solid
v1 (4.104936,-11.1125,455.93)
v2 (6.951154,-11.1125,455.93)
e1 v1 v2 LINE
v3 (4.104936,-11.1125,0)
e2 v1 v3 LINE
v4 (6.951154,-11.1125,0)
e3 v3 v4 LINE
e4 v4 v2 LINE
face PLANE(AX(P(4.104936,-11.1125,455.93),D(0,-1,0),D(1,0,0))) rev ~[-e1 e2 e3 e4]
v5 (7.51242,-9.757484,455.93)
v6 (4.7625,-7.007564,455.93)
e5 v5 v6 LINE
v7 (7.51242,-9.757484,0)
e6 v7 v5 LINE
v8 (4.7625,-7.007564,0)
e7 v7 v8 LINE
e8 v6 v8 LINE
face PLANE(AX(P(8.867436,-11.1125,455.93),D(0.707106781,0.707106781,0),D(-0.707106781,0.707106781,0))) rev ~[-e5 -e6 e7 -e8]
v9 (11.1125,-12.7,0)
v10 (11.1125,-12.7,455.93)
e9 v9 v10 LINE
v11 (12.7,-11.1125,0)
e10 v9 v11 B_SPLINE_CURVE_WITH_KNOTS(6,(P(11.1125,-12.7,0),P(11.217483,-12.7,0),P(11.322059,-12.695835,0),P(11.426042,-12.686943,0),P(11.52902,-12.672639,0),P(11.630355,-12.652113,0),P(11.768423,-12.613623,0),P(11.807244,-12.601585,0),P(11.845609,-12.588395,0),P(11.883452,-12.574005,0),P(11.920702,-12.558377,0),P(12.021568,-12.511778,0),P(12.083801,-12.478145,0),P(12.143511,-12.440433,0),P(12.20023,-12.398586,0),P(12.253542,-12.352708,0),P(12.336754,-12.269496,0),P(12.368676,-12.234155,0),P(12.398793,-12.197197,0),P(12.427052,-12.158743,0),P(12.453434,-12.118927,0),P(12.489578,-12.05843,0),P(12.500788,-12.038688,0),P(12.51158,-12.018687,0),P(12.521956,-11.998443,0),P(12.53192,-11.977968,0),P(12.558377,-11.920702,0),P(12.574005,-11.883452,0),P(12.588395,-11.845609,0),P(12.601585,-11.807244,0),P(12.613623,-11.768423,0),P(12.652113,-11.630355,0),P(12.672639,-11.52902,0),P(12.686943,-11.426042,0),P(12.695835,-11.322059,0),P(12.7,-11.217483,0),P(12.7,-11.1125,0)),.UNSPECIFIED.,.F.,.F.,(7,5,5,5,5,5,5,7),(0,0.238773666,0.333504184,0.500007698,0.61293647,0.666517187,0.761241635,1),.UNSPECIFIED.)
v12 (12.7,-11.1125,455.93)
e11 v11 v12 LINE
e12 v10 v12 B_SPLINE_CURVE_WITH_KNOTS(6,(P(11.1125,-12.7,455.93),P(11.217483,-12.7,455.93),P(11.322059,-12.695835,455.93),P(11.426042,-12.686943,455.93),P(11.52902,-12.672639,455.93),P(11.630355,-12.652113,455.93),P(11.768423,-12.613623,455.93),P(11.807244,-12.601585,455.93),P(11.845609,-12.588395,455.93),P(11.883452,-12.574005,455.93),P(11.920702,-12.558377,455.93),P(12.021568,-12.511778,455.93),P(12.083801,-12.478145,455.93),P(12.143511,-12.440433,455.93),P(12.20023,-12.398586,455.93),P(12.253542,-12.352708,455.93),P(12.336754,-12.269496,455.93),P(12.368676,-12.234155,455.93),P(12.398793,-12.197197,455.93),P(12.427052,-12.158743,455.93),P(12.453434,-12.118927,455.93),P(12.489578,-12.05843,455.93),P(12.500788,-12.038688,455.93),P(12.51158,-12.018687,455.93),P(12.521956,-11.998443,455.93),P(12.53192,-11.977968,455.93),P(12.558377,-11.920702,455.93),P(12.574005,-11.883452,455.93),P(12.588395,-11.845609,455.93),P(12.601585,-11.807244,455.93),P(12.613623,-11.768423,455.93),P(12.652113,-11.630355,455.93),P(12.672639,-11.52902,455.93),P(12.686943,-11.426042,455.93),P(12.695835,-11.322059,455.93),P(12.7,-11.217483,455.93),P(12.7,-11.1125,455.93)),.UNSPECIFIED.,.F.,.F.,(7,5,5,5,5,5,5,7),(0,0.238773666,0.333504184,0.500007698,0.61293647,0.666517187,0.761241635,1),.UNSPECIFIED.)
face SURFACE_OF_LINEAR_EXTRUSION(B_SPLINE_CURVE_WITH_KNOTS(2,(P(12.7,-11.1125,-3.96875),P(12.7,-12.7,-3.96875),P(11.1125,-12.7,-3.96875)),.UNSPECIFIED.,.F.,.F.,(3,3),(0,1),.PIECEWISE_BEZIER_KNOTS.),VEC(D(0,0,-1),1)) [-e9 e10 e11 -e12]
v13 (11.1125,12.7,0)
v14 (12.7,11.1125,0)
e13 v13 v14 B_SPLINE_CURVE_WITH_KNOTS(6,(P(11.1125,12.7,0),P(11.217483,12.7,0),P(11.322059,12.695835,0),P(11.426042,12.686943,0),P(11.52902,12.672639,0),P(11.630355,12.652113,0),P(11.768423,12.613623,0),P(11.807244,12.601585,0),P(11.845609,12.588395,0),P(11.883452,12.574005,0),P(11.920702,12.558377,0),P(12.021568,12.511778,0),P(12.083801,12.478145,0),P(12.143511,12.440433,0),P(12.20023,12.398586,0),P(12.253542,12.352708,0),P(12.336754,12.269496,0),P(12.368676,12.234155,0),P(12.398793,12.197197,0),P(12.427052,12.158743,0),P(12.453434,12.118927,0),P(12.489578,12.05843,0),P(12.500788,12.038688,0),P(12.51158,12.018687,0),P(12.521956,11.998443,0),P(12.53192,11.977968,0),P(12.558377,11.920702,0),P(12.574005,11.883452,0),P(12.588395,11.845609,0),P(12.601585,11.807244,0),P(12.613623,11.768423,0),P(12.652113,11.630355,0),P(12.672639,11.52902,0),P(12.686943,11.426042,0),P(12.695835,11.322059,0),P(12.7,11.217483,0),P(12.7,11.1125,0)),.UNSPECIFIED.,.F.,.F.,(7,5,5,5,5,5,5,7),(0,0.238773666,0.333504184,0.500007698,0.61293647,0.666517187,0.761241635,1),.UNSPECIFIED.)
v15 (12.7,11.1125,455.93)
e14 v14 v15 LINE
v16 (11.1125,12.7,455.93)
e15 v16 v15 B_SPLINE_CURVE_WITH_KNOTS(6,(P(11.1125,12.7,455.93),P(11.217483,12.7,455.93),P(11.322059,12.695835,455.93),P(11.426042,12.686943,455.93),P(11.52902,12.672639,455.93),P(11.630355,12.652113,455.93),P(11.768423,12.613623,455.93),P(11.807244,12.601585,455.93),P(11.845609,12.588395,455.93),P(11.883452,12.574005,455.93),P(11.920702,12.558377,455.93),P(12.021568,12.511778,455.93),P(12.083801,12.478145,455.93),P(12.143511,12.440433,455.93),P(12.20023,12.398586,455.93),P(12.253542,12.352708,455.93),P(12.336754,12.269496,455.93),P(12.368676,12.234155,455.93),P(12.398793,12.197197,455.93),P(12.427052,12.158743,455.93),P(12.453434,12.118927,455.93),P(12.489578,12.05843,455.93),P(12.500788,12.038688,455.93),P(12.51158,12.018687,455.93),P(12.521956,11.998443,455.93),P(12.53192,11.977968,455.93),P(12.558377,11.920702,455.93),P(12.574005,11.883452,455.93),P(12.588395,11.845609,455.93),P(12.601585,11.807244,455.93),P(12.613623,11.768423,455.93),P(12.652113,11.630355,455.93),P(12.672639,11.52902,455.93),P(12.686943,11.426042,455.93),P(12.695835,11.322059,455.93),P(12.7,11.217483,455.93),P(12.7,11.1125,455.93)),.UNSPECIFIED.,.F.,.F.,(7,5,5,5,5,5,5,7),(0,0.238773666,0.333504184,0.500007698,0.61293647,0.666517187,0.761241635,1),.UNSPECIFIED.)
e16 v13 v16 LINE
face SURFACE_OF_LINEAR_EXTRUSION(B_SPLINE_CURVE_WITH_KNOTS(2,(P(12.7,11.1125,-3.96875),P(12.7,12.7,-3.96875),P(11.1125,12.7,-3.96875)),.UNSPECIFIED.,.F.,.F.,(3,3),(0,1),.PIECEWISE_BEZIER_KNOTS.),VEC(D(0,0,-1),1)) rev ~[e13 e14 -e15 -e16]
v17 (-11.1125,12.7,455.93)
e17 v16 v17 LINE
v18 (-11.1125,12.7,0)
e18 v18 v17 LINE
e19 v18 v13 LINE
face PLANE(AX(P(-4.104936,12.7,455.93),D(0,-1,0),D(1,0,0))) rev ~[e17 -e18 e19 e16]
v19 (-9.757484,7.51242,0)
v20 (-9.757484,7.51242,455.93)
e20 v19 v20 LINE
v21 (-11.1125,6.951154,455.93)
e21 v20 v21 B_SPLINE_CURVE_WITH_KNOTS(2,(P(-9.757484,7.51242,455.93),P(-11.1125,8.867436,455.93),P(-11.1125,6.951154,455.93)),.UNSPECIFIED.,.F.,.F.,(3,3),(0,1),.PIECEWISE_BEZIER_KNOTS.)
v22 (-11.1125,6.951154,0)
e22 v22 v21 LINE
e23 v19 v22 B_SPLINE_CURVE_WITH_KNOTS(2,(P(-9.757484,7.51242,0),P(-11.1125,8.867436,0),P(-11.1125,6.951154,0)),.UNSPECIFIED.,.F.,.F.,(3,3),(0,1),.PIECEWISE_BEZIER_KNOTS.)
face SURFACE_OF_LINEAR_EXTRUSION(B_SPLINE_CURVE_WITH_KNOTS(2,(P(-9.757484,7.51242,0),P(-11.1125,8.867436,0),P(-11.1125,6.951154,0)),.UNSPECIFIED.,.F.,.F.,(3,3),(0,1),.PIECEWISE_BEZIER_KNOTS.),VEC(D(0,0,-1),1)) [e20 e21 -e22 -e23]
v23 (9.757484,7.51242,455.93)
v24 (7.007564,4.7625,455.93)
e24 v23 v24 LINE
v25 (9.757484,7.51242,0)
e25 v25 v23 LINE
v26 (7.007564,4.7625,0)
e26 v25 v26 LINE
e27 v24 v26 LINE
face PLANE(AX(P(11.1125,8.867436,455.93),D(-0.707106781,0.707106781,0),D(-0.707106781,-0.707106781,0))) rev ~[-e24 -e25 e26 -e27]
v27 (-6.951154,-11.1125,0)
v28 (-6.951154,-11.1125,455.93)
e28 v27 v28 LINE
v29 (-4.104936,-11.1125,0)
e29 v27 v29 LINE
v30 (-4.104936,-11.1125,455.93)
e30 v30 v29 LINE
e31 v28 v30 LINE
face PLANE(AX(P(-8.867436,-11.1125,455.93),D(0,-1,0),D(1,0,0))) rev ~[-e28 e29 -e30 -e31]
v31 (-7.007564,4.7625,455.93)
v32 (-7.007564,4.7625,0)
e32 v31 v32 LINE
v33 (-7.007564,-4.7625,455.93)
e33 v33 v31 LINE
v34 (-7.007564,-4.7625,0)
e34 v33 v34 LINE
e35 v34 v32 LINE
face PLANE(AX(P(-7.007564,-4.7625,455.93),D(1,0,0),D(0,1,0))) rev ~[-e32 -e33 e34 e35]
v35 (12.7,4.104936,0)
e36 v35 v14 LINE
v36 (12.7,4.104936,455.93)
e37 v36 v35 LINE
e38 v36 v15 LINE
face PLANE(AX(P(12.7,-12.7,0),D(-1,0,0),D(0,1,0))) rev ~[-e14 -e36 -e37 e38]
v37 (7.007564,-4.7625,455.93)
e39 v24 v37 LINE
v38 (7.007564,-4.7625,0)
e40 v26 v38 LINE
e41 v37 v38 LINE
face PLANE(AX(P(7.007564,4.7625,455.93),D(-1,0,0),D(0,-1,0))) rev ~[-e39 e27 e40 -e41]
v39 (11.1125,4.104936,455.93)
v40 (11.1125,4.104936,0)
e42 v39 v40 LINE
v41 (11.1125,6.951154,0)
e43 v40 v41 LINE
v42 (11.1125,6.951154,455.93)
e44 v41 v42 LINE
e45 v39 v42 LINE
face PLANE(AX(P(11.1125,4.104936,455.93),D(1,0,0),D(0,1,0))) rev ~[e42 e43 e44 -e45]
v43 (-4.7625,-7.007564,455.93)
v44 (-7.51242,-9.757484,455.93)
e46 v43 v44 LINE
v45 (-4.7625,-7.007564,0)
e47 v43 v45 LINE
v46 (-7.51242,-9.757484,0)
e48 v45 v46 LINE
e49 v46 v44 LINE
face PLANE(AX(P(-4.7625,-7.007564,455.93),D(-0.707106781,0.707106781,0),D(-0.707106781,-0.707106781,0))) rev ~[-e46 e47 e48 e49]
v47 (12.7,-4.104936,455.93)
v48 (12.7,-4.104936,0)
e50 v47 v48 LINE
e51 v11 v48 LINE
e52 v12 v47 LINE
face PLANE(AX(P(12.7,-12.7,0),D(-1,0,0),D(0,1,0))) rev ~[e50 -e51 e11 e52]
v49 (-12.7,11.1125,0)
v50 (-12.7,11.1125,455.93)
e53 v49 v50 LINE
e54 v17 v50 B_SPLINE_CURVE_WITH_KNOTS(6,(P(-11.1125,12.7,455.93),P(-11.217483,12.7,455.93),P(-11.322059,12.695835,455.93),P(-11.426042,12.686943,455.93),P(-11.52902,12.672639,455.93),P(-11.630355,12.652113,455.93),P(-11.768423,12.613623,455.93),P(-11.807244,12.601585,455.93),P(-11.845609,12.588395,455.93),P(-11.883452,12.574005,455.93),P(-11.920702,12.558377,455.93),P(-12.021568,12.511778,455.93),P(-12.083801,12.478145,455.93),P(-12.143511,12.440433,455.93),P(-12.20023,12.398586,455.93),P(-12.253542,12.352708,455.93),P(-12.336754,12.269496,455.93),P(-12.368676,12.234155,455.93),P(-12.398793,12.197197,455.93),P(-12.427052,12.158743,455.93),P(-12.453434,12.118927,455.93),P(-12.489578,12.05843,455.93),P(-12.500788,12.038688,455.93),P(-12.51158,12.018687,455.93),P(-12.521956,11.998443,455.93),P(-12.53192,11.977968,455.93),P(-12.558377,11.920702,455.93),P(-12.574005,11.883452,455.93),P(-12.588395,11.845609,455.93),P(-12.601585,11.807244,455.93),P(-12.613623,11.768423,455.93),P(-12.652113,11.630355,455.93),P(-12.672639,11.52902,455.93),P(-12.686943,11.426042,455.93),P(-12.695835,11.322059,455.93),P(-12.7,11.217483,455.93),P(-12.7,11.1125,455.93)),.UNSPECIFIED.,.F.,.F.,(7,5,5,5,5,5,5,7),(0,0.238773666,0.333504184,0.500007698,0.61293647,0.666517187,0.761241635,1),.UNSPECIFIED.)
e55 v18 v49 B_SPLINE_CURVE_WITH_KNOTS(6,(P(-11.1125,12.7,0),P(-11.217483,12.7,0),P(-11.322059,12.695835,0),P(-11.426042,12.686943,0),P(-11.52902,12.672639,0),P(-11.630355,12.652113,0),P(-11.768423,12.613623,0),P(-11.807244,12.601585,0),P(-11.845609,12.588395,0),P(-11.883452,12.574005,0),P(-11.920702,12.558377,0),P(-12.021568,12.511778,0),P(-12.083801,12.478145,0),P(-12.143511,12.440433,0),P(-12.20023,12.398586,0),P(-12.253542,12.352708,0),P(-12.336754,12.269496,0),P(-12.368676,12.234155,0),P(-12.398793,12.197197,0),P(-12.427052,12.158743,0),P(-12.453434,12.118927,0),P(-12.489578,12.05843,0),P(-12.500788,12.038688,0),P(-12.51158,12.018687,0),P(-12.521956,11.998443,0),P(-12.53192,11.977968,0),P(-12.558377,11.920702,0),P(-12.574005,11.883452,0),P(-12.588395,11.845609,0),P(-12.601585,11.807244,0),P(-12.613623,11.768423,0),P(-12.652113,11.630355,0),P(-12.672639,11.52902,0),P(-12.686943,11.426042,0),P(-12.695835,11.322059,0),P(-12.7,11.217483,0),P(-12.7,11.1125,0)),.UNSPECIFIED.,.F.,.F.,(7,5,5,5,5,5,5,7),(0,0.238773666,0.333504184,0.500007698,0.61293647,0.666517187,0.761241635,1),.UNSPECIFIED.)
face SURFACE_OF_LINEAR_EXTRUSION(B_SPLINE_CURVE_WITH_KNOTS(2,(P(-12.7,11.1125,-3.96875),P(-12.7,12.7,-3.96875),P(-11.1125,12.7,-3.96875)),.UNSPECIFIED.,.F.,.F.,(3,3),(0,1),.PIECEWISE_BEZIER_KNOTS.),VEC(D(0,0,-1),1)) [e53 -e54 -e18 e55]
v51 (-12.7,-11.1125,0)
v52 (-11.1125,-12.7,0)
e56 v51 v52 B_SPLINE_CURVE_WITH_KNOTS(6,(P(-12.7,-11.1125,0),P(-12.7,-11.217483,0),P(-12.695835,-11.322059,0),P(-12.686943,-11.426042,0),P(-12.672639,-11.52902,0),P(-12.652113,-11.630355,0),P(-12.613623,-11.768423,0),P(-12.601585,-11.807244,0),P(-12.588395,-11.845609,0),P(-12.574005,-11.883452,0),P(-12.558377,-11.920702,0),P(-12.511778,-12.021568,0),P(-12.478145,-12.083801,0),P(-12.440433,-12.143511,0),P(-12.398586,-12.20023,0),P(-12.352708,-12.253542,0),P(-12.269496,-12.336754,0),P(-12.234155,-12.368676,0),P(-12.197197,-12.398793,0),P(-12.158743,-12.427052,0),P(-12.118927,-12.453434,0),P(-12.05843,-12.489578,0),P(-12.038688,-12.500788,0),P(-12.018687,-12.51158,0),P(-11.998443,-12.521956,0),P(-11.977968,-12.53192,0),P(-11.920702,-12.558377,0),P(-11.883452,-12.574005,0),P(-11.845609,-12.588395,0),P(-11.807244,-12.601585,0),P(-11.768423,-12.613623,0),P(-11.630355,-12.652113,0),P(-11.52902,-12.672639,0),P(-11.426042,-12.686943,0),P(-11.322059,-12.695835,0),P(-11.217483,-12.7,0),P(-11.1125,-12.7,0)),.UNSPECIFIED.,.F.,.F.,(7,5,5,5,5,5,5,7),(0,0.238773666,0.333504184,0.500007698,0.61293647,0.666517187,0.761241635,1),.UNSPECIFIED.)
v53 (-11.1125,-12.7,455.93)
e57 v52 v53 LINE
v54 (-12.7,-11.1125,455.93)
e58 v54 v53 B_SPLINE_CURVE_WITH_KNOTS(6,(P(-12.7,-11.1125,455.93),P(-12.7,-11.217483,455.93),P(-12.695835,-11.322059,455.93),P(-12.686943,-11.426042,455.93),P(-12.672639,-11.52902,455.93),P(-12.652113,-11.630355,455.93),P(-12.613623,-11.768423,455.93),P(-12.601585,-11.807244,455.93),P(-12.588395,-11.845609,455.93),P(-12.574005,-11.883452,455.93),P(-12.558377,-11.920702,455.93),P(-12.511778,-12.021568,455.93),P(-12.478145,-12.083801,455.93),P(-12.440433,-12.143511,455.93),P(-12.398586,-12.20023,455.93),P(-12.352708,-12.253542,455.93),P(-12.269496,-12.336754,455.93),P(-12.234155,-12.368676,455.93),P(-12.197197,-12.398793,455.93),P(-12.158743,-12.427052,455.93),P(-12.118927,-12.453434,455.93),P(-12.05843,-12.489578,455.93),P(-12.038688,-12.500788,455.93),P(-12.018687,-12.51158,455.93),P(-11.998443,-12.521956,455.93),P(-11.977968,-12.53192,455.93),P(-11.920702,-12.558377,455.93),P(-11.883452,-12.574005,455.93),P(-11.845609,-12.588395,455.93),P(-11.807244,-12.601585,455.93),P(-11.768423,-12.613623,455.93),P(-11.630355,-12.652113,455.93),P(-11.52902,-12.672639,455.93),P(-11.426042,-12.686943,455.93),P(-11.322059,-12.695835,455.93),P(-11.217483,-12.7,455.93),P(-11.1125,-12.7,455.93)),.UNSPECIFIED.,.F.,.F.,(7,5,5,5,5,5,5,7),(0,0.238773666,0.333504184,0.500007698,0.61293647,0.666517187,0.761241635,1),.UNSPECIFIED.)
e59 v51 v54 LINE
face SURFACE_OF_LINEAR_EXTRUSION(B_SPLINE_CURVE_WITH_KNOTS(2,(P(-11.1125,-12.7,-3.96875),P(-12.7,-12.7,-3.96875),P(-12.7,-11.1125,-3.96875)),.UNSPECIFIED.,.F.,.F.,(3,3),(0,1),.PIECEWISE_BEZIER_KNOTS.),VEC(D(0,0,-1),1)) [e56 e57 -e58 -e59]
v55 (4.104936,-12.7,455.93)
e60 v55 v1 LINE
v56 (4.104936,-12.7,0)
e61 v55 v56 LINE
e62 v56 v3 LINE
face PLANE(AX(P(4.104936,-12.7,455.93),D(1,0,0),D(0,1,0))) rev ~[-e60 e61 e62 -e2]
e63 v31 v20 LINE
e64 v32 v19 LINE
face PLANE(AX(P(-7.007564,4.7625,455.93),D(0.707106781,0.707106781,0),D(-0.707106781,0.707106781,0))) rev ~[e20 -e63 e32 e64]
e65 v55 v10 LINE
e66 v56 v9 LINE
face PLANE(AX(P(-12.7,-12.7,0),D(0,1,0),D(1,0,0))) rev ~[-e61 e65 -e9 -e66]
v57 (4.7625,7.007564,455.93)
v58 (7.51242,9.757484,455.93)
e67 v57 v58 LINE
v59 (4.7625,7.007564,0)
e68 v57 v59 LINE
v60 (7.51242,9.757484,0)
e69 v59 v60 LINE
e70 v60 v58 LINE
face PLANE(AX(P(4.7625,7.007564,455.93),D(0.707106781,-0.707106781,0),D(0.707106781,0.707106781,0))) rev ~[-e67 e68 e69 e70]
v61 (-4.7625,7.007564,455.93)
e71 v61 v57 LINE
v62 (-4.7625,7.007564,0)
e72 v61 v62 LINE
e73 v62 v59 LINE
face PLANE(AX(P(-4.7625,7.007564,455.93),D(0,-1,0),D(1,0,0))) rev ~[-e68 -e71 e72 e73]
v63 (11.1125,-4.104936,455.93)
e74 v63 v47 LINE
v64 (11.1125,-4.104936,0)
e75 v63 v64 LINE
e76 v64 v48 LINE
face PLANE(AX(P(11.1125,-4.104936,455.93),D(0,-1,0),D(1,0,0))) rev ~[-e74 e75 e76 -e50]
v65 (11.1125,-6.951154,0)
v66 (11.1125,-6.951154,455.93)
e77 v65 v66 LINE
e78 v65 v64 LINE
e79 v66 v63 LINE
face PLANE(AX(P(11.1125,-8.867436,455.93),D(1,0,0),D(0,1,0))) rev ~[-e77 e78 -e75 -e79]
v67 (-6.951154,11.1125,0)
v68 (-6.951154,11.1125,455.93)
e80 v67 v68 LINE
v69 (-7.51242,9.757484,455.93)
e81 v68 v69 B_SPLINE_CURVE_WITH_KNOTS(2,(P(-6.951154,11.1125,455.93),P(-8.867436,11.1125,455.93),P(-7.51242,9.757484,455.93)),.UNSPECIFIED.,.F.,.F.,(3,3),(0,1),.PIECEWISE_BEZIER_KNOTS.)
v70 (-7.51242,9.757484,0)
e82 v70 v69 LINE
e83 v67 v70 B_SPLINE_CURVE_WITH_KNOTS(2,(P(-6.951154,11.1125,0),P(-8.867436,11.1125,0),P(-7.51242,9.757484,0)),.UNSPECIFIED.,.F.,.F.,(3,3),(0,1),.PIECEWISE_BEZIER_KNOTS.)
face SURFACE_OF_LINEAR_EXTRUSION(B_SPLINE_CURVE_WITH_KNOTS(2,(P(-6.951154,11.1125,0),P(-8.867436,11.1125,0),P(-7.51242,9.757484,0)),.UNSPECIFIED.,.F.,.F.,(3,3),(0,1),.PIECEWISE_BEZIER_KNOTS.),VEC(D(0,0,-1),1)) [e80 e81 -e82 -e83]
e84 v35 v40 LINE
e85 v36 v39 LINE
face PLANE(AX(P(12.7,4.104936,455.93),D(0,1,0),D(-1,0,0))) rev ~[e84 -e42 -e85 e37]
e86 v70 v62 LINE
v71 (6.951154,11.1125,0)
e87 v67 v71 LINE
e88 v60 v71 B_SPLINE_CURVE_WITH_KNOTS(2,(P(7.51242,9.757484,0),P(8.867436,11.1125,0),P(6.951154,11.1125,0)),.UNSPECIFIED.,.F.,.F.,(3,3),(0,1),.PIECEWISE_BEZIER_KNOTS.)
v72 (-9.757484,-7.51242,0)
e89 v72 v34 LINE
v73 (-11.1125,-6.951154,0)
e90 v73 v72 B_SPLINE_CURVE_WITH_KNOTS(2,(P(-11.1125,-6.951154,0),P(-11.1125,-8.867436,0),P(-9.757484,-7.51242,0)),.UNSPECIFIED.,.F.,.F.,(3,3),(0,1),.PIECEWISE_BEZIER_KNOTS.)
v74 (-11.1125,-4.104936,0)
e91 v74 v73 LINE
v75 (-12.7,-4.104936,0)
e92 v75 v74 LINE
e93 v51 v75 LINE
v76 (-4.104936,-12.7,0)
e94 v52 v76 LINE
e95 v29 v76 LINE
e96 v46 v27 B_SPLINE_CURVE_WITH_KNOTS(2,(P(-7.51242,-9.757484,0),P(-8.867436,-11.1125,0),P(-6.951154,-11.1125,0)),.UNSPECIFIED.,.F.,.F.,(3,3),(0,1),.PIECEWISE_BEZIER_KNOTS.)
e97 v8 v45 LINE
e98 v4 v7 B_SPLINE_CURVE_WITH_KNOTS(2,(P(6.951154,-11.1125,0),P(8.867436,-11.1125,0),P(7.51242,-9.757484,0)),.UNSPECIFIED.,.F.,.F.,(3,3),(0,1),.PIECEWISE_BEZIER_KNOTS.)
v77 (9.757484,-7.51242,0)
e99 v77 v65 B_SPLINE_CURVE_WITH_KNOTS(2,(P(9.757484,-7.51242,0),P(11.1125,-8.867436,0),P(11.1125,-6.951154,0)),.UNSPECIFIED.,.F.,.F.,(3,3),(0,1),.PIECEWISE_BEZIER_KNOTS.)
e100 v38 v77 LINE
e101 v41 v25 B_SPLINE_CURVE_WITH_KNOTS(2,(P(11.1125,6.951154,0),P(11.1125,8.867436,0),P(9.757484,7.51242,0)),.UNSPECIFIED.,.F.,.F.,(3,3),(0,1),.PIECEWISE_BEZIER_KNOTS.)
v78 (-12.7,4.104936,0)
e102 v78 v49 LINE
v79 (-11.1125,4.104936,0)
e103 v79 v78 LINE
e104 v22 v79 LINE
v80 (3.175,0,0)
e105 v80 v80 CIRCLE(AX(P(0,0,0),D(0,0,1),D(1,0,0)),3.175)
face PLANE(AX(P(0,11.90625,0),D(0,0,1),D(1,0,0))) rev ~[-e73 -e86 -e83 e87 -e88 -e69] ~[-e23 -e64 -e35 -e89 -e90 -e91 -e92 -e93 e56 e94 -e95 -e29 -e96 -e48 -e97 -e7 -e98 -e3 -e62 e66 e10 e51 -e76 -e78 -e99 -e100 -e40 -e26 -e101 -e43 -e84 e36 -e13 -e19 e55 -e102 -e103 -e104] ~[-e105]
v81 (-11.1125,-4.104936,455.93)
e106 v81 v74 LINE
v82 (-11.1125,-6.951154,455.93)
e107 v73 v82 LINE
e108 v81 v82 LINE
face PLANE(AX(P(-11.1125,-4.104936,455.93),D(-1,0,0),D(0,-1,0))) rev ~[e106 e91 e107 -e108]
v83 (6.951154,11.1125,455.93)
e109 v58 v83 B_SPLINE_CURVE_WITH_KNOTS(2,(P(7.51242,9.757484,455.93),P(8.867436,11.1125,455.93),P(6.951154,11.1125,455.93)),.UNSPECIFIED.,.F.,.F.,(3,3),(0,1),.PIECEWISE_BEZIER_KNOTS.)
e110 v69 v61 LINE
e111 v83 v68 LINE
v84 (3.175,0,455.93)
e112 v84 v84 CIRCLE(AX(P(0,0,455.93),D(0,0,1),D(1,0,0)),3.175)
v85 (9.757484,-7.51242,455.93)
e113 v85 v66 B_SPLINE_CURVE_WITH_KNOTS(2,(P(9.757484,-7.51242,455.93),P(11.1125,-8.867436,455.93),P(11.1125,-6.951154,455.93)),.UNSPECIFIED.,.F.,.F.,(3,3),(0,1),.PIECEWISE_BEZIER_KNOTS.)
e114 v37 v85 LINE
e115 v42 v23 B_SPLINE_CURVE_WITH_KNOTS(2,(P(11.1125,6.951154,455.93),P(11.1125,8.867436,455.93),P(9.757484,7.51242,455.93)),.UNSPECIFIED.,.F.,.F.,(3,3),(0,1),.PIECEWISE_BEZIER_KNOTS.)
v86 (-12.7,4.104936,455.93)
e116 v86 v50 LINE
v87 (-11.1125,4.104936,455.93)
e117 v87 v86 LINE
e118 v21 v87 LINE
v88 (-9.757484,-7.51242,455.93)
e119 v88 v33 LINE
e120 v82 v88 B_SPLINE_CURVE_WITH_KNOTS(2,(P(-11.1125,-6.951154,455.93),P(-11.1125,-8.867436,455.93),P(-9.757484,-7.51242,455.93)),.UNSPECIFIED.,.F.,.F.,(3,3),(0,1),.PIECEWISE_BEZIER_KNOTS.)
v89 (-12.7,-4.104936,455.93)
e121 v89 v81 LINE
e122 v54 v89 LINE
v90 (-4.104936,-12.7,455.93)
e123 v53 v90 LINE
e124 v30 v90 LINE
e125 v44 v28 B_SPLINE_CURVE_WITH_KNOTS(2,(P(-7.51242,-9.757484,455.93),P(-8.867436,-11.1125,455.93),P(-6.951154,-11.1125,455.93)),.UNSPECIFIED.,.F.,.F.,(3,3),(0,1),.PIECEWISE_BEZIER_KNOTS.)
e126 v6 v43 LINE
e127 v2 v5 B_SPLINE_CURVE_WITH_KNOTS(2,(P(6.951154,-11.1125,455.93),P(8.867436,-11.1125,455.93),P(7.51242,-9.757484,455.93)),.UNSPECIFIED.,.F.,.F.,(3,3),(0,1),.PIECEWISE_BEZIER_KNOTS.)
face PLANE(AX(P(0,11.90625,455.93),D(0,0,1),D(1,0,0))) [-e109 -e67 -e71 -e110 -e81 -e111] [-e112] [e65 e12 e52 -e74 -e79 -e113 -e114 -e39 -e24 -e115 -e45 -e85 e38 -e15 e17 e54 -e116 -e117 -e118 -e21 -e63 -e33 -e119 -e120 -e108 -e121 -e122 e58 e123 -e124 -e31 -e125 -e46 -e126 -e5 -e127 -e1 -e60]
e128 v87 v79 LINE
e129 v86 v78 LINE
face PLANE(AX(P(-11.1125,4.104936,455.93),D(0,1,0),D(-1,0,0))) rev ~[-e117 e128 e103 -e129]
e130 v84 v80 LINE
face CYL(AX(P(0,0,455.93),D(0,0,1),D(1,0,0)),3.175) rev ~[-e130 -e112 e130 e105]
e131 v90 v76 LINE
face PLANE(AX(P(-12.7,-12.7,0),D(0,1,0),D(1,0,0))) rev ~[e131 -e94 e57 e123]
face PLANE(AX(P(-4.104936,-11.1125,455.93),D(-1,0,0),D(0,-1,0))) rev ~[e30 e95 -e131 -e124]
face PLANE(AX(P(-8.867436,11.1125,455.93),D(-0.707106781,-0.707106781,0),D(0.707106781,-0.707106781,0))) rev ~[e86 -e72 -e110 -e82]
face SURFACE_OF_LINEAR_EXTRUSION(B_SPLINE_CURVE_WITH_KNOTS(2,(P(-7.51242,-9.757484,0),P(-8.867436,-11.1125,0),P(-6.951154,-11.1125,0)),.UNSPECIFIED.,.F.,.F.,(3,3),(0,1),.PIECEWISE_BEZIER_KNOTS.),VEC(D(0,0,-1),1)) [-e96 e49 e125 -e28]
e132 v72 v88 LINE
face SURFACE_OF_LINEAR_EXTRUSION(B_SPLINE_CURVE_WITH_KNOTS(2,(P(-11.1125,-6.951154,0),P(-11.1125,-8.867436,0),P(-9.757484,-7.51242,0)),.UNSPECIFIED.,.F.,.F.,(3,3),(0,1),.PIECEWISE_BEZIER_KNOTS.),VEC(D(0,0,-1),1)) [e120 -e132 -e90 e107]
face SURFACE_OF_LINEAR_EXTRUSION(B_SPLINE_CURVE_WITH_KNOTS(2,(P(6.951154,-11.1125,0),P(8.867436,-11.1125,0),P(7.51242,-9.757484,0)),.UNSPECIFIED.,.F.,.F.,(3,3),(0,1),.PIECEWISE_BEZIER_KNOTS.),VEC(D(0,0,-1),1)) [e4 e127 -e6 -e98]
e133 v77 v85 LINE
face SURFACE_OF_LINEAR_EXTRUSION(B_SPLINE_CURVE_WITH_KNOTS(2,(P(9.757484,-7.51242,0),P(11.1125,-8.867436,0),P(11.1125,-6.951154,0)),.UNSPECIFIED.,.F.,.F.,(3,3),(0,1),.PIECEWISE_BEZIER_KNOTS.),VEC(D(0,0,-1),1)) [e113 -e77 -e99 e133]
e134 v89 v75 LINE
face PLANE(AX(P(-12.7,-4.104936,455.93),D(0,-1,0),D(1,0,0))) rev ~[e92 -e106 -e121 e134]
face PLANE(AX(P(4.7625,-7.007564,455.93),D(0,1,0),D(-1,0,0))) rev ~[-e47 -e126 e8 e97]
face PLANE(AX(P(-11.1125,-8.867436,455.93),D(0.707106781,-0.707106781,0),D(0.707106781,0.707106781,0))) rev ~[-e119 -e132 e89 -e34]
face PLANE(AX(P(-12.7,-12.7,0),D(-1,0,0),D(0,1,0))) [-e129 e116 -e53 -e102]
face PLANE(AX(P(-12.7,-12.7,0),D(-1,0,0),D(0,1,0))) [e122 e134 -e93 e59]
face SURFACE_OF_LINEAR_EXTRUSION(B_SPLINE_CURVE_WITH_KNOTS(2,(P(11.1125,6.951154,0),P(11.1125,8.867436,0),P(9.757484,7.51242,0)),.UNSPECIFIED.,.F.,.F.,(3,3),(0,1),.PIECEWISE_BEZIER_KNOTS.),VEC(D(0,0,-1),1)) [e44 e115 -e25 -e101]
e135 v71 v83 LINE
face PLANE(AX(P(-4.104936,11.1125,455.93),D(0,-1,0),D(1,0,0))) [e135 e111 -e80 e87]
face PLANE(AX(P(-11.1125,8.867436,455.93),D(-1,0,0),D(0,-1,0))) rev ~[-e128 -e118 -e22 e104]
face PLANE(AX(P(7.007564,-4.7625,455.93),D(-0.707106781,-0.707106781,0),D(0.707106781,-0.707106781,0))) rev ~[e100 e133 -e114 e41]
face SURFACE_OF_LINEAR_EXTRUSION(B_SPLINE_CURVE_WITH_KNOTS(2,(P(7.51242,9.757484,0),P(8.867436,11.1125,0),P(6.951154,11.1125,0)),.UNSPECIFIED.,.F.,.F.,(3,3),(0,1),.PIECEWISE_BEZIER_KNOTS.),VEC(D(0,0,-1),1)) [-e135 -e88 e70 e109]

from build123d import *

# Parameters (mm, degrees)
F0_W        = 25.4
F0_H        = 25.4
F1_DEPTH    = 455.93
F3_DEPTH    = 455.93
F4_R        = 3.175
F5_DEPTH    = 455.93
F6_T1_DEPTH = 463.8675
F7_T1_DEPTH = 455.93
F8_W        = 8.2098719395
F8_H        = 1.5875
F9_DEPTH    = 455.93


# Not quite as in the source:
# - a fillet or chamfer that OpenCascade refuses, or shapes differently, is made with other operations: its cross-section is extruded or revolved along the edge and cut away or added


with BuildPart() as f1:
    # F0 (on Top) → F1 (new body)
    with BuildSketch(Plane.XY):
        Rectangle(F0_W, F0_H)
    extrude(amount=F1_DEPTH)

    # F2 (on face) → F3 (cut)
    with BuildSketch(Plane.XY.offset(455.93)):
        Polygon((-7.0075640303, -4.7625), (-7.0075640303, 4.7625), (-11.1125, 8.8674359697), (-11.1125, 4.1049359697), (-12.7, 4.1049359697), (-12.7, -4.1049359697), (-11.1125, -4.1049359697), (-11.1125, -8.8674359697), align=None)
        Polygon((4.1049359697, 12.7), (-4.1049359697, 12.7), (-4.1049359697, 11.1125), (-8.8674359697, 11.1125), (-4.7625, 7.0075640303), (4.7625, 7.0075640303), (8.8674359697, 11.1125), (4.1049359697, 11.1125), align=None)
        Polygon((12.7, -4.1049359697), (12.7, 4.1049359697), (11.1125, 4.1049359697), (11.1125, 8.8674359697), (7.0075640303, 4.7625), (7.0075640303, -4.7625), (11.1125, -8.8674359697), (11.1125, -4.1049359697), align=None)
        Polygon((-4.1049359697, -11.1125), (-4.1049359697, -12.7), (4.1049359697, -12.7), (4.1049359697, -11.1125), (8.8674359697, -11.1125), (4.7625, -7.0075640303), (-4.7625, -7.0075640303), (-8.8674359697, -11.1125), align=None)
    extrude(amount=-F3_DEPTH, mode=Mode.SUBTRACT)

    # F4 (on face) → F5 (cut)
    with BuildSketch(Plane.XY.offset(455.93)):
        Circle(F4_R)
    extrude(amount=-F5_DEPTH, mode=Mode.SUBTRACT)

    # F6: fillet of radius 1.5875 on 4 edges, made by hand

    # F6_s2 → F6_t1 (cut)
    with BuildSketch(Plane.XY.offset(-3.96875)):
        with BuildLine():
            add(Edge.make_bspline(
                [(-12.7, 11.1125), (-12.7, 12.7), (-11.1125, 12.7)],
                knots=[0, 0, 0, 1, 1, 1], degree=2, weights=[1, 1, 1]))
            Line((-11.1125, 12.7), (-12.7, 12.7))
            Line((-12.7, 12.7), (-12.7, 11.1125))
        make_face()
        with BuildLine():
            add(Edge.make_bspline(
                [(12.7, 11.1125), (12.7, 12.7), (11.1125, 12.7)],
                knots=[0, 0, 0, 1, 1, 1], degree=2, weights=[1, 1, 1]))
            Line((11.1125, 12.7), (12.7, 12.7))
            Line((12.7, 12.7), (12.7, 11.1125))
        make_face()
        with BuildLine():
            add(Edge.make_bspline(
                [(12.7, -11.1125), (12.7, -12.7), (11.1125, -12.7)],
                knots=[0, 0, 0, 1, 1, 1], degree=2, weights=[1, 1, 1]))
            Line((11.1125, -12.7), (12.7, -12.7))
            Line((12.7, -12.7), (12.7, -11.1125))
        make_face()
        with BuildLine():
            add(Edge.make_bspline(
                [(-11.1125, -12.7), (-12.7, -12.7), (-12.7, -11.1125)],
                knots=[0, 0, 0, 1, 1, 1], degree=2, weights=[1, 1, 1]))
            Line((-12.7, -11.1125), (-12.7, -12.7))
            Line((-12.7, -12.7), (-11.1125, -12.7))
        make_face()
    extrude(amount=F6_T1_DEPTH, mode=Mode.SUBTRACT)

    # F7: fillet of radius 0.79375 on 8 edges, made by hand

    # F7_s2 → F7_t1 (join)
    with BuildSketch(Plane.XY):
        with BuildLine():
            add(Edge.make_bspline(
                [(-9.7574839924, 7.5124199622), (-11.1125, 8.8674359697), (-11.1125, 6.9511539546)],
                knots=[0, 0, 0, 1, 1, 1], degree=2, weights=[1, 1, 1]))
            Line((-11.1125, 6.9511539546), (-11.1125, 8.8674359697))
            Line((-11.1125, 8.8674359697), (-9.7574839924, 7.5124199622))
        make_face()
        with BuildLine():
            add(Edge.make_bspline(
                [(11.1125, 6.9511539546), (11.1125, 8.8674359697), (9.7574839924, 7.5124199622)],
                knots=[0, 0, 0, 1, 1, 1], degree=2, weights=[1, 1, 1]))
            Line((9.7574839924, 7.5124199622), (11.1125, 8.8674359697))
            Line((11.1125, 8.8674359697), (11.1125, 6.9511539546))
        make_face()
        with BuildLine():
            add(Edge.make_bspline(
                [(9.7574839924, -7.5124199622), (11.1125, -8.8674359697), (11.1125, -6.9511539546)],
                knots=[0, 0, 0, 1, 1, 1], degree=2, weights=[1, 1, 1]))
            Line((11.1125, -6.9511539546), (11.1125, -8.8674359697))
            Line((11.1125, -8.8674359697), (9.7574839924, -7.5124199622))
        make_face()
        with BuildLine():
            add(Edge.make_bspline(
                [(-11.1125, -6.9511539546), (-11.1125, -8.8674359697), (-9.7574839924, -7.5124199622)],
                knots=[0, 0, 0, 1, 1, 1], degree=2, weights=[1, 1, 1]))
            Line((-9.7574839924, -7.5124199622), (-11.1125, -8.8674359697))
            Line((-11.1125, -8.8674359697), (-11.1125, -6.9511539546))
        make_face()
        with BuildLine():
            add(Edge.make_bspline(
                [(-7.5124199622, -9.7574839924), (-8.8674359697, -11.1125), (-6.9511539546, -11.1125)],
                knots=[0, 0, 0, 1, 1, 1], degree=2, weights=[1, 1, 1]))
            Line((-6.9511539546, -11.1125), (-8.8674359697, -11.1125))
            Line((-8.8674359697, -11.1125), (-7.5124199622, -9.7574839924))
        make_face()
        with BuildLine():
            add(Edge.make_bspline(
                [(6.9511539546, -11.1125), (8.8674359697, -11.1125), (7.5124199622, -9.7574839924)],
                knots=[0, 0, 0, 1, 1, 1], degree=2, weights=[1, 1, 1]))
            Line((7.5124199622, -9.7574839924), (8.8674359697, -11.1125))
            Line((8.8674359697, -11.1125), (6.9511539546, -11.1125))
        make_face()
        with BuildLine():
            add(Edge.make_bspline(
                [(7.5124199622, 9.7574839924), (8.8674359697, 11.1125), (6.9511539546, 11.1125)],
                knots=[0, 0, 0, 1, 1, 1], degree=2, weights=[1, 1, 1]))
            Line((6.9511539546, 11.1125), (8.8674359697, 11.1125))
            Line((8.8674359697, 11.1125), (7.5124199622, 9.7574839924))
        make_face()
        with BuildLine():
            add(Edge.make_bspline(
                [(-6.9511539546, 11.1125), (-8.8674359697, 11.1125), (-7.5124199622, 9.7574839924)],
                knots=[0, 0, 0, 1, 1, 1], degree=2, weights=[1, 1, 1]))
            Line((-7.5124199622, 9.7574839924), (-8.8674359697, 11.1125))
            Line((-8.8674359697, 11.1125), (-6.9511539546, 11.1125))
        make_face()
    extrude(amount=F7_T1_DEPTH)

    # F8 (on face) → F9 (join)
    with BuildSketch(Plane.XY.offset(455.93)):
        with Locations((0, 11.90625)):
            Rectangle(F8_W, F8_H)
    extrude(amount=-F9_DEPTH)


solid = f1.part
